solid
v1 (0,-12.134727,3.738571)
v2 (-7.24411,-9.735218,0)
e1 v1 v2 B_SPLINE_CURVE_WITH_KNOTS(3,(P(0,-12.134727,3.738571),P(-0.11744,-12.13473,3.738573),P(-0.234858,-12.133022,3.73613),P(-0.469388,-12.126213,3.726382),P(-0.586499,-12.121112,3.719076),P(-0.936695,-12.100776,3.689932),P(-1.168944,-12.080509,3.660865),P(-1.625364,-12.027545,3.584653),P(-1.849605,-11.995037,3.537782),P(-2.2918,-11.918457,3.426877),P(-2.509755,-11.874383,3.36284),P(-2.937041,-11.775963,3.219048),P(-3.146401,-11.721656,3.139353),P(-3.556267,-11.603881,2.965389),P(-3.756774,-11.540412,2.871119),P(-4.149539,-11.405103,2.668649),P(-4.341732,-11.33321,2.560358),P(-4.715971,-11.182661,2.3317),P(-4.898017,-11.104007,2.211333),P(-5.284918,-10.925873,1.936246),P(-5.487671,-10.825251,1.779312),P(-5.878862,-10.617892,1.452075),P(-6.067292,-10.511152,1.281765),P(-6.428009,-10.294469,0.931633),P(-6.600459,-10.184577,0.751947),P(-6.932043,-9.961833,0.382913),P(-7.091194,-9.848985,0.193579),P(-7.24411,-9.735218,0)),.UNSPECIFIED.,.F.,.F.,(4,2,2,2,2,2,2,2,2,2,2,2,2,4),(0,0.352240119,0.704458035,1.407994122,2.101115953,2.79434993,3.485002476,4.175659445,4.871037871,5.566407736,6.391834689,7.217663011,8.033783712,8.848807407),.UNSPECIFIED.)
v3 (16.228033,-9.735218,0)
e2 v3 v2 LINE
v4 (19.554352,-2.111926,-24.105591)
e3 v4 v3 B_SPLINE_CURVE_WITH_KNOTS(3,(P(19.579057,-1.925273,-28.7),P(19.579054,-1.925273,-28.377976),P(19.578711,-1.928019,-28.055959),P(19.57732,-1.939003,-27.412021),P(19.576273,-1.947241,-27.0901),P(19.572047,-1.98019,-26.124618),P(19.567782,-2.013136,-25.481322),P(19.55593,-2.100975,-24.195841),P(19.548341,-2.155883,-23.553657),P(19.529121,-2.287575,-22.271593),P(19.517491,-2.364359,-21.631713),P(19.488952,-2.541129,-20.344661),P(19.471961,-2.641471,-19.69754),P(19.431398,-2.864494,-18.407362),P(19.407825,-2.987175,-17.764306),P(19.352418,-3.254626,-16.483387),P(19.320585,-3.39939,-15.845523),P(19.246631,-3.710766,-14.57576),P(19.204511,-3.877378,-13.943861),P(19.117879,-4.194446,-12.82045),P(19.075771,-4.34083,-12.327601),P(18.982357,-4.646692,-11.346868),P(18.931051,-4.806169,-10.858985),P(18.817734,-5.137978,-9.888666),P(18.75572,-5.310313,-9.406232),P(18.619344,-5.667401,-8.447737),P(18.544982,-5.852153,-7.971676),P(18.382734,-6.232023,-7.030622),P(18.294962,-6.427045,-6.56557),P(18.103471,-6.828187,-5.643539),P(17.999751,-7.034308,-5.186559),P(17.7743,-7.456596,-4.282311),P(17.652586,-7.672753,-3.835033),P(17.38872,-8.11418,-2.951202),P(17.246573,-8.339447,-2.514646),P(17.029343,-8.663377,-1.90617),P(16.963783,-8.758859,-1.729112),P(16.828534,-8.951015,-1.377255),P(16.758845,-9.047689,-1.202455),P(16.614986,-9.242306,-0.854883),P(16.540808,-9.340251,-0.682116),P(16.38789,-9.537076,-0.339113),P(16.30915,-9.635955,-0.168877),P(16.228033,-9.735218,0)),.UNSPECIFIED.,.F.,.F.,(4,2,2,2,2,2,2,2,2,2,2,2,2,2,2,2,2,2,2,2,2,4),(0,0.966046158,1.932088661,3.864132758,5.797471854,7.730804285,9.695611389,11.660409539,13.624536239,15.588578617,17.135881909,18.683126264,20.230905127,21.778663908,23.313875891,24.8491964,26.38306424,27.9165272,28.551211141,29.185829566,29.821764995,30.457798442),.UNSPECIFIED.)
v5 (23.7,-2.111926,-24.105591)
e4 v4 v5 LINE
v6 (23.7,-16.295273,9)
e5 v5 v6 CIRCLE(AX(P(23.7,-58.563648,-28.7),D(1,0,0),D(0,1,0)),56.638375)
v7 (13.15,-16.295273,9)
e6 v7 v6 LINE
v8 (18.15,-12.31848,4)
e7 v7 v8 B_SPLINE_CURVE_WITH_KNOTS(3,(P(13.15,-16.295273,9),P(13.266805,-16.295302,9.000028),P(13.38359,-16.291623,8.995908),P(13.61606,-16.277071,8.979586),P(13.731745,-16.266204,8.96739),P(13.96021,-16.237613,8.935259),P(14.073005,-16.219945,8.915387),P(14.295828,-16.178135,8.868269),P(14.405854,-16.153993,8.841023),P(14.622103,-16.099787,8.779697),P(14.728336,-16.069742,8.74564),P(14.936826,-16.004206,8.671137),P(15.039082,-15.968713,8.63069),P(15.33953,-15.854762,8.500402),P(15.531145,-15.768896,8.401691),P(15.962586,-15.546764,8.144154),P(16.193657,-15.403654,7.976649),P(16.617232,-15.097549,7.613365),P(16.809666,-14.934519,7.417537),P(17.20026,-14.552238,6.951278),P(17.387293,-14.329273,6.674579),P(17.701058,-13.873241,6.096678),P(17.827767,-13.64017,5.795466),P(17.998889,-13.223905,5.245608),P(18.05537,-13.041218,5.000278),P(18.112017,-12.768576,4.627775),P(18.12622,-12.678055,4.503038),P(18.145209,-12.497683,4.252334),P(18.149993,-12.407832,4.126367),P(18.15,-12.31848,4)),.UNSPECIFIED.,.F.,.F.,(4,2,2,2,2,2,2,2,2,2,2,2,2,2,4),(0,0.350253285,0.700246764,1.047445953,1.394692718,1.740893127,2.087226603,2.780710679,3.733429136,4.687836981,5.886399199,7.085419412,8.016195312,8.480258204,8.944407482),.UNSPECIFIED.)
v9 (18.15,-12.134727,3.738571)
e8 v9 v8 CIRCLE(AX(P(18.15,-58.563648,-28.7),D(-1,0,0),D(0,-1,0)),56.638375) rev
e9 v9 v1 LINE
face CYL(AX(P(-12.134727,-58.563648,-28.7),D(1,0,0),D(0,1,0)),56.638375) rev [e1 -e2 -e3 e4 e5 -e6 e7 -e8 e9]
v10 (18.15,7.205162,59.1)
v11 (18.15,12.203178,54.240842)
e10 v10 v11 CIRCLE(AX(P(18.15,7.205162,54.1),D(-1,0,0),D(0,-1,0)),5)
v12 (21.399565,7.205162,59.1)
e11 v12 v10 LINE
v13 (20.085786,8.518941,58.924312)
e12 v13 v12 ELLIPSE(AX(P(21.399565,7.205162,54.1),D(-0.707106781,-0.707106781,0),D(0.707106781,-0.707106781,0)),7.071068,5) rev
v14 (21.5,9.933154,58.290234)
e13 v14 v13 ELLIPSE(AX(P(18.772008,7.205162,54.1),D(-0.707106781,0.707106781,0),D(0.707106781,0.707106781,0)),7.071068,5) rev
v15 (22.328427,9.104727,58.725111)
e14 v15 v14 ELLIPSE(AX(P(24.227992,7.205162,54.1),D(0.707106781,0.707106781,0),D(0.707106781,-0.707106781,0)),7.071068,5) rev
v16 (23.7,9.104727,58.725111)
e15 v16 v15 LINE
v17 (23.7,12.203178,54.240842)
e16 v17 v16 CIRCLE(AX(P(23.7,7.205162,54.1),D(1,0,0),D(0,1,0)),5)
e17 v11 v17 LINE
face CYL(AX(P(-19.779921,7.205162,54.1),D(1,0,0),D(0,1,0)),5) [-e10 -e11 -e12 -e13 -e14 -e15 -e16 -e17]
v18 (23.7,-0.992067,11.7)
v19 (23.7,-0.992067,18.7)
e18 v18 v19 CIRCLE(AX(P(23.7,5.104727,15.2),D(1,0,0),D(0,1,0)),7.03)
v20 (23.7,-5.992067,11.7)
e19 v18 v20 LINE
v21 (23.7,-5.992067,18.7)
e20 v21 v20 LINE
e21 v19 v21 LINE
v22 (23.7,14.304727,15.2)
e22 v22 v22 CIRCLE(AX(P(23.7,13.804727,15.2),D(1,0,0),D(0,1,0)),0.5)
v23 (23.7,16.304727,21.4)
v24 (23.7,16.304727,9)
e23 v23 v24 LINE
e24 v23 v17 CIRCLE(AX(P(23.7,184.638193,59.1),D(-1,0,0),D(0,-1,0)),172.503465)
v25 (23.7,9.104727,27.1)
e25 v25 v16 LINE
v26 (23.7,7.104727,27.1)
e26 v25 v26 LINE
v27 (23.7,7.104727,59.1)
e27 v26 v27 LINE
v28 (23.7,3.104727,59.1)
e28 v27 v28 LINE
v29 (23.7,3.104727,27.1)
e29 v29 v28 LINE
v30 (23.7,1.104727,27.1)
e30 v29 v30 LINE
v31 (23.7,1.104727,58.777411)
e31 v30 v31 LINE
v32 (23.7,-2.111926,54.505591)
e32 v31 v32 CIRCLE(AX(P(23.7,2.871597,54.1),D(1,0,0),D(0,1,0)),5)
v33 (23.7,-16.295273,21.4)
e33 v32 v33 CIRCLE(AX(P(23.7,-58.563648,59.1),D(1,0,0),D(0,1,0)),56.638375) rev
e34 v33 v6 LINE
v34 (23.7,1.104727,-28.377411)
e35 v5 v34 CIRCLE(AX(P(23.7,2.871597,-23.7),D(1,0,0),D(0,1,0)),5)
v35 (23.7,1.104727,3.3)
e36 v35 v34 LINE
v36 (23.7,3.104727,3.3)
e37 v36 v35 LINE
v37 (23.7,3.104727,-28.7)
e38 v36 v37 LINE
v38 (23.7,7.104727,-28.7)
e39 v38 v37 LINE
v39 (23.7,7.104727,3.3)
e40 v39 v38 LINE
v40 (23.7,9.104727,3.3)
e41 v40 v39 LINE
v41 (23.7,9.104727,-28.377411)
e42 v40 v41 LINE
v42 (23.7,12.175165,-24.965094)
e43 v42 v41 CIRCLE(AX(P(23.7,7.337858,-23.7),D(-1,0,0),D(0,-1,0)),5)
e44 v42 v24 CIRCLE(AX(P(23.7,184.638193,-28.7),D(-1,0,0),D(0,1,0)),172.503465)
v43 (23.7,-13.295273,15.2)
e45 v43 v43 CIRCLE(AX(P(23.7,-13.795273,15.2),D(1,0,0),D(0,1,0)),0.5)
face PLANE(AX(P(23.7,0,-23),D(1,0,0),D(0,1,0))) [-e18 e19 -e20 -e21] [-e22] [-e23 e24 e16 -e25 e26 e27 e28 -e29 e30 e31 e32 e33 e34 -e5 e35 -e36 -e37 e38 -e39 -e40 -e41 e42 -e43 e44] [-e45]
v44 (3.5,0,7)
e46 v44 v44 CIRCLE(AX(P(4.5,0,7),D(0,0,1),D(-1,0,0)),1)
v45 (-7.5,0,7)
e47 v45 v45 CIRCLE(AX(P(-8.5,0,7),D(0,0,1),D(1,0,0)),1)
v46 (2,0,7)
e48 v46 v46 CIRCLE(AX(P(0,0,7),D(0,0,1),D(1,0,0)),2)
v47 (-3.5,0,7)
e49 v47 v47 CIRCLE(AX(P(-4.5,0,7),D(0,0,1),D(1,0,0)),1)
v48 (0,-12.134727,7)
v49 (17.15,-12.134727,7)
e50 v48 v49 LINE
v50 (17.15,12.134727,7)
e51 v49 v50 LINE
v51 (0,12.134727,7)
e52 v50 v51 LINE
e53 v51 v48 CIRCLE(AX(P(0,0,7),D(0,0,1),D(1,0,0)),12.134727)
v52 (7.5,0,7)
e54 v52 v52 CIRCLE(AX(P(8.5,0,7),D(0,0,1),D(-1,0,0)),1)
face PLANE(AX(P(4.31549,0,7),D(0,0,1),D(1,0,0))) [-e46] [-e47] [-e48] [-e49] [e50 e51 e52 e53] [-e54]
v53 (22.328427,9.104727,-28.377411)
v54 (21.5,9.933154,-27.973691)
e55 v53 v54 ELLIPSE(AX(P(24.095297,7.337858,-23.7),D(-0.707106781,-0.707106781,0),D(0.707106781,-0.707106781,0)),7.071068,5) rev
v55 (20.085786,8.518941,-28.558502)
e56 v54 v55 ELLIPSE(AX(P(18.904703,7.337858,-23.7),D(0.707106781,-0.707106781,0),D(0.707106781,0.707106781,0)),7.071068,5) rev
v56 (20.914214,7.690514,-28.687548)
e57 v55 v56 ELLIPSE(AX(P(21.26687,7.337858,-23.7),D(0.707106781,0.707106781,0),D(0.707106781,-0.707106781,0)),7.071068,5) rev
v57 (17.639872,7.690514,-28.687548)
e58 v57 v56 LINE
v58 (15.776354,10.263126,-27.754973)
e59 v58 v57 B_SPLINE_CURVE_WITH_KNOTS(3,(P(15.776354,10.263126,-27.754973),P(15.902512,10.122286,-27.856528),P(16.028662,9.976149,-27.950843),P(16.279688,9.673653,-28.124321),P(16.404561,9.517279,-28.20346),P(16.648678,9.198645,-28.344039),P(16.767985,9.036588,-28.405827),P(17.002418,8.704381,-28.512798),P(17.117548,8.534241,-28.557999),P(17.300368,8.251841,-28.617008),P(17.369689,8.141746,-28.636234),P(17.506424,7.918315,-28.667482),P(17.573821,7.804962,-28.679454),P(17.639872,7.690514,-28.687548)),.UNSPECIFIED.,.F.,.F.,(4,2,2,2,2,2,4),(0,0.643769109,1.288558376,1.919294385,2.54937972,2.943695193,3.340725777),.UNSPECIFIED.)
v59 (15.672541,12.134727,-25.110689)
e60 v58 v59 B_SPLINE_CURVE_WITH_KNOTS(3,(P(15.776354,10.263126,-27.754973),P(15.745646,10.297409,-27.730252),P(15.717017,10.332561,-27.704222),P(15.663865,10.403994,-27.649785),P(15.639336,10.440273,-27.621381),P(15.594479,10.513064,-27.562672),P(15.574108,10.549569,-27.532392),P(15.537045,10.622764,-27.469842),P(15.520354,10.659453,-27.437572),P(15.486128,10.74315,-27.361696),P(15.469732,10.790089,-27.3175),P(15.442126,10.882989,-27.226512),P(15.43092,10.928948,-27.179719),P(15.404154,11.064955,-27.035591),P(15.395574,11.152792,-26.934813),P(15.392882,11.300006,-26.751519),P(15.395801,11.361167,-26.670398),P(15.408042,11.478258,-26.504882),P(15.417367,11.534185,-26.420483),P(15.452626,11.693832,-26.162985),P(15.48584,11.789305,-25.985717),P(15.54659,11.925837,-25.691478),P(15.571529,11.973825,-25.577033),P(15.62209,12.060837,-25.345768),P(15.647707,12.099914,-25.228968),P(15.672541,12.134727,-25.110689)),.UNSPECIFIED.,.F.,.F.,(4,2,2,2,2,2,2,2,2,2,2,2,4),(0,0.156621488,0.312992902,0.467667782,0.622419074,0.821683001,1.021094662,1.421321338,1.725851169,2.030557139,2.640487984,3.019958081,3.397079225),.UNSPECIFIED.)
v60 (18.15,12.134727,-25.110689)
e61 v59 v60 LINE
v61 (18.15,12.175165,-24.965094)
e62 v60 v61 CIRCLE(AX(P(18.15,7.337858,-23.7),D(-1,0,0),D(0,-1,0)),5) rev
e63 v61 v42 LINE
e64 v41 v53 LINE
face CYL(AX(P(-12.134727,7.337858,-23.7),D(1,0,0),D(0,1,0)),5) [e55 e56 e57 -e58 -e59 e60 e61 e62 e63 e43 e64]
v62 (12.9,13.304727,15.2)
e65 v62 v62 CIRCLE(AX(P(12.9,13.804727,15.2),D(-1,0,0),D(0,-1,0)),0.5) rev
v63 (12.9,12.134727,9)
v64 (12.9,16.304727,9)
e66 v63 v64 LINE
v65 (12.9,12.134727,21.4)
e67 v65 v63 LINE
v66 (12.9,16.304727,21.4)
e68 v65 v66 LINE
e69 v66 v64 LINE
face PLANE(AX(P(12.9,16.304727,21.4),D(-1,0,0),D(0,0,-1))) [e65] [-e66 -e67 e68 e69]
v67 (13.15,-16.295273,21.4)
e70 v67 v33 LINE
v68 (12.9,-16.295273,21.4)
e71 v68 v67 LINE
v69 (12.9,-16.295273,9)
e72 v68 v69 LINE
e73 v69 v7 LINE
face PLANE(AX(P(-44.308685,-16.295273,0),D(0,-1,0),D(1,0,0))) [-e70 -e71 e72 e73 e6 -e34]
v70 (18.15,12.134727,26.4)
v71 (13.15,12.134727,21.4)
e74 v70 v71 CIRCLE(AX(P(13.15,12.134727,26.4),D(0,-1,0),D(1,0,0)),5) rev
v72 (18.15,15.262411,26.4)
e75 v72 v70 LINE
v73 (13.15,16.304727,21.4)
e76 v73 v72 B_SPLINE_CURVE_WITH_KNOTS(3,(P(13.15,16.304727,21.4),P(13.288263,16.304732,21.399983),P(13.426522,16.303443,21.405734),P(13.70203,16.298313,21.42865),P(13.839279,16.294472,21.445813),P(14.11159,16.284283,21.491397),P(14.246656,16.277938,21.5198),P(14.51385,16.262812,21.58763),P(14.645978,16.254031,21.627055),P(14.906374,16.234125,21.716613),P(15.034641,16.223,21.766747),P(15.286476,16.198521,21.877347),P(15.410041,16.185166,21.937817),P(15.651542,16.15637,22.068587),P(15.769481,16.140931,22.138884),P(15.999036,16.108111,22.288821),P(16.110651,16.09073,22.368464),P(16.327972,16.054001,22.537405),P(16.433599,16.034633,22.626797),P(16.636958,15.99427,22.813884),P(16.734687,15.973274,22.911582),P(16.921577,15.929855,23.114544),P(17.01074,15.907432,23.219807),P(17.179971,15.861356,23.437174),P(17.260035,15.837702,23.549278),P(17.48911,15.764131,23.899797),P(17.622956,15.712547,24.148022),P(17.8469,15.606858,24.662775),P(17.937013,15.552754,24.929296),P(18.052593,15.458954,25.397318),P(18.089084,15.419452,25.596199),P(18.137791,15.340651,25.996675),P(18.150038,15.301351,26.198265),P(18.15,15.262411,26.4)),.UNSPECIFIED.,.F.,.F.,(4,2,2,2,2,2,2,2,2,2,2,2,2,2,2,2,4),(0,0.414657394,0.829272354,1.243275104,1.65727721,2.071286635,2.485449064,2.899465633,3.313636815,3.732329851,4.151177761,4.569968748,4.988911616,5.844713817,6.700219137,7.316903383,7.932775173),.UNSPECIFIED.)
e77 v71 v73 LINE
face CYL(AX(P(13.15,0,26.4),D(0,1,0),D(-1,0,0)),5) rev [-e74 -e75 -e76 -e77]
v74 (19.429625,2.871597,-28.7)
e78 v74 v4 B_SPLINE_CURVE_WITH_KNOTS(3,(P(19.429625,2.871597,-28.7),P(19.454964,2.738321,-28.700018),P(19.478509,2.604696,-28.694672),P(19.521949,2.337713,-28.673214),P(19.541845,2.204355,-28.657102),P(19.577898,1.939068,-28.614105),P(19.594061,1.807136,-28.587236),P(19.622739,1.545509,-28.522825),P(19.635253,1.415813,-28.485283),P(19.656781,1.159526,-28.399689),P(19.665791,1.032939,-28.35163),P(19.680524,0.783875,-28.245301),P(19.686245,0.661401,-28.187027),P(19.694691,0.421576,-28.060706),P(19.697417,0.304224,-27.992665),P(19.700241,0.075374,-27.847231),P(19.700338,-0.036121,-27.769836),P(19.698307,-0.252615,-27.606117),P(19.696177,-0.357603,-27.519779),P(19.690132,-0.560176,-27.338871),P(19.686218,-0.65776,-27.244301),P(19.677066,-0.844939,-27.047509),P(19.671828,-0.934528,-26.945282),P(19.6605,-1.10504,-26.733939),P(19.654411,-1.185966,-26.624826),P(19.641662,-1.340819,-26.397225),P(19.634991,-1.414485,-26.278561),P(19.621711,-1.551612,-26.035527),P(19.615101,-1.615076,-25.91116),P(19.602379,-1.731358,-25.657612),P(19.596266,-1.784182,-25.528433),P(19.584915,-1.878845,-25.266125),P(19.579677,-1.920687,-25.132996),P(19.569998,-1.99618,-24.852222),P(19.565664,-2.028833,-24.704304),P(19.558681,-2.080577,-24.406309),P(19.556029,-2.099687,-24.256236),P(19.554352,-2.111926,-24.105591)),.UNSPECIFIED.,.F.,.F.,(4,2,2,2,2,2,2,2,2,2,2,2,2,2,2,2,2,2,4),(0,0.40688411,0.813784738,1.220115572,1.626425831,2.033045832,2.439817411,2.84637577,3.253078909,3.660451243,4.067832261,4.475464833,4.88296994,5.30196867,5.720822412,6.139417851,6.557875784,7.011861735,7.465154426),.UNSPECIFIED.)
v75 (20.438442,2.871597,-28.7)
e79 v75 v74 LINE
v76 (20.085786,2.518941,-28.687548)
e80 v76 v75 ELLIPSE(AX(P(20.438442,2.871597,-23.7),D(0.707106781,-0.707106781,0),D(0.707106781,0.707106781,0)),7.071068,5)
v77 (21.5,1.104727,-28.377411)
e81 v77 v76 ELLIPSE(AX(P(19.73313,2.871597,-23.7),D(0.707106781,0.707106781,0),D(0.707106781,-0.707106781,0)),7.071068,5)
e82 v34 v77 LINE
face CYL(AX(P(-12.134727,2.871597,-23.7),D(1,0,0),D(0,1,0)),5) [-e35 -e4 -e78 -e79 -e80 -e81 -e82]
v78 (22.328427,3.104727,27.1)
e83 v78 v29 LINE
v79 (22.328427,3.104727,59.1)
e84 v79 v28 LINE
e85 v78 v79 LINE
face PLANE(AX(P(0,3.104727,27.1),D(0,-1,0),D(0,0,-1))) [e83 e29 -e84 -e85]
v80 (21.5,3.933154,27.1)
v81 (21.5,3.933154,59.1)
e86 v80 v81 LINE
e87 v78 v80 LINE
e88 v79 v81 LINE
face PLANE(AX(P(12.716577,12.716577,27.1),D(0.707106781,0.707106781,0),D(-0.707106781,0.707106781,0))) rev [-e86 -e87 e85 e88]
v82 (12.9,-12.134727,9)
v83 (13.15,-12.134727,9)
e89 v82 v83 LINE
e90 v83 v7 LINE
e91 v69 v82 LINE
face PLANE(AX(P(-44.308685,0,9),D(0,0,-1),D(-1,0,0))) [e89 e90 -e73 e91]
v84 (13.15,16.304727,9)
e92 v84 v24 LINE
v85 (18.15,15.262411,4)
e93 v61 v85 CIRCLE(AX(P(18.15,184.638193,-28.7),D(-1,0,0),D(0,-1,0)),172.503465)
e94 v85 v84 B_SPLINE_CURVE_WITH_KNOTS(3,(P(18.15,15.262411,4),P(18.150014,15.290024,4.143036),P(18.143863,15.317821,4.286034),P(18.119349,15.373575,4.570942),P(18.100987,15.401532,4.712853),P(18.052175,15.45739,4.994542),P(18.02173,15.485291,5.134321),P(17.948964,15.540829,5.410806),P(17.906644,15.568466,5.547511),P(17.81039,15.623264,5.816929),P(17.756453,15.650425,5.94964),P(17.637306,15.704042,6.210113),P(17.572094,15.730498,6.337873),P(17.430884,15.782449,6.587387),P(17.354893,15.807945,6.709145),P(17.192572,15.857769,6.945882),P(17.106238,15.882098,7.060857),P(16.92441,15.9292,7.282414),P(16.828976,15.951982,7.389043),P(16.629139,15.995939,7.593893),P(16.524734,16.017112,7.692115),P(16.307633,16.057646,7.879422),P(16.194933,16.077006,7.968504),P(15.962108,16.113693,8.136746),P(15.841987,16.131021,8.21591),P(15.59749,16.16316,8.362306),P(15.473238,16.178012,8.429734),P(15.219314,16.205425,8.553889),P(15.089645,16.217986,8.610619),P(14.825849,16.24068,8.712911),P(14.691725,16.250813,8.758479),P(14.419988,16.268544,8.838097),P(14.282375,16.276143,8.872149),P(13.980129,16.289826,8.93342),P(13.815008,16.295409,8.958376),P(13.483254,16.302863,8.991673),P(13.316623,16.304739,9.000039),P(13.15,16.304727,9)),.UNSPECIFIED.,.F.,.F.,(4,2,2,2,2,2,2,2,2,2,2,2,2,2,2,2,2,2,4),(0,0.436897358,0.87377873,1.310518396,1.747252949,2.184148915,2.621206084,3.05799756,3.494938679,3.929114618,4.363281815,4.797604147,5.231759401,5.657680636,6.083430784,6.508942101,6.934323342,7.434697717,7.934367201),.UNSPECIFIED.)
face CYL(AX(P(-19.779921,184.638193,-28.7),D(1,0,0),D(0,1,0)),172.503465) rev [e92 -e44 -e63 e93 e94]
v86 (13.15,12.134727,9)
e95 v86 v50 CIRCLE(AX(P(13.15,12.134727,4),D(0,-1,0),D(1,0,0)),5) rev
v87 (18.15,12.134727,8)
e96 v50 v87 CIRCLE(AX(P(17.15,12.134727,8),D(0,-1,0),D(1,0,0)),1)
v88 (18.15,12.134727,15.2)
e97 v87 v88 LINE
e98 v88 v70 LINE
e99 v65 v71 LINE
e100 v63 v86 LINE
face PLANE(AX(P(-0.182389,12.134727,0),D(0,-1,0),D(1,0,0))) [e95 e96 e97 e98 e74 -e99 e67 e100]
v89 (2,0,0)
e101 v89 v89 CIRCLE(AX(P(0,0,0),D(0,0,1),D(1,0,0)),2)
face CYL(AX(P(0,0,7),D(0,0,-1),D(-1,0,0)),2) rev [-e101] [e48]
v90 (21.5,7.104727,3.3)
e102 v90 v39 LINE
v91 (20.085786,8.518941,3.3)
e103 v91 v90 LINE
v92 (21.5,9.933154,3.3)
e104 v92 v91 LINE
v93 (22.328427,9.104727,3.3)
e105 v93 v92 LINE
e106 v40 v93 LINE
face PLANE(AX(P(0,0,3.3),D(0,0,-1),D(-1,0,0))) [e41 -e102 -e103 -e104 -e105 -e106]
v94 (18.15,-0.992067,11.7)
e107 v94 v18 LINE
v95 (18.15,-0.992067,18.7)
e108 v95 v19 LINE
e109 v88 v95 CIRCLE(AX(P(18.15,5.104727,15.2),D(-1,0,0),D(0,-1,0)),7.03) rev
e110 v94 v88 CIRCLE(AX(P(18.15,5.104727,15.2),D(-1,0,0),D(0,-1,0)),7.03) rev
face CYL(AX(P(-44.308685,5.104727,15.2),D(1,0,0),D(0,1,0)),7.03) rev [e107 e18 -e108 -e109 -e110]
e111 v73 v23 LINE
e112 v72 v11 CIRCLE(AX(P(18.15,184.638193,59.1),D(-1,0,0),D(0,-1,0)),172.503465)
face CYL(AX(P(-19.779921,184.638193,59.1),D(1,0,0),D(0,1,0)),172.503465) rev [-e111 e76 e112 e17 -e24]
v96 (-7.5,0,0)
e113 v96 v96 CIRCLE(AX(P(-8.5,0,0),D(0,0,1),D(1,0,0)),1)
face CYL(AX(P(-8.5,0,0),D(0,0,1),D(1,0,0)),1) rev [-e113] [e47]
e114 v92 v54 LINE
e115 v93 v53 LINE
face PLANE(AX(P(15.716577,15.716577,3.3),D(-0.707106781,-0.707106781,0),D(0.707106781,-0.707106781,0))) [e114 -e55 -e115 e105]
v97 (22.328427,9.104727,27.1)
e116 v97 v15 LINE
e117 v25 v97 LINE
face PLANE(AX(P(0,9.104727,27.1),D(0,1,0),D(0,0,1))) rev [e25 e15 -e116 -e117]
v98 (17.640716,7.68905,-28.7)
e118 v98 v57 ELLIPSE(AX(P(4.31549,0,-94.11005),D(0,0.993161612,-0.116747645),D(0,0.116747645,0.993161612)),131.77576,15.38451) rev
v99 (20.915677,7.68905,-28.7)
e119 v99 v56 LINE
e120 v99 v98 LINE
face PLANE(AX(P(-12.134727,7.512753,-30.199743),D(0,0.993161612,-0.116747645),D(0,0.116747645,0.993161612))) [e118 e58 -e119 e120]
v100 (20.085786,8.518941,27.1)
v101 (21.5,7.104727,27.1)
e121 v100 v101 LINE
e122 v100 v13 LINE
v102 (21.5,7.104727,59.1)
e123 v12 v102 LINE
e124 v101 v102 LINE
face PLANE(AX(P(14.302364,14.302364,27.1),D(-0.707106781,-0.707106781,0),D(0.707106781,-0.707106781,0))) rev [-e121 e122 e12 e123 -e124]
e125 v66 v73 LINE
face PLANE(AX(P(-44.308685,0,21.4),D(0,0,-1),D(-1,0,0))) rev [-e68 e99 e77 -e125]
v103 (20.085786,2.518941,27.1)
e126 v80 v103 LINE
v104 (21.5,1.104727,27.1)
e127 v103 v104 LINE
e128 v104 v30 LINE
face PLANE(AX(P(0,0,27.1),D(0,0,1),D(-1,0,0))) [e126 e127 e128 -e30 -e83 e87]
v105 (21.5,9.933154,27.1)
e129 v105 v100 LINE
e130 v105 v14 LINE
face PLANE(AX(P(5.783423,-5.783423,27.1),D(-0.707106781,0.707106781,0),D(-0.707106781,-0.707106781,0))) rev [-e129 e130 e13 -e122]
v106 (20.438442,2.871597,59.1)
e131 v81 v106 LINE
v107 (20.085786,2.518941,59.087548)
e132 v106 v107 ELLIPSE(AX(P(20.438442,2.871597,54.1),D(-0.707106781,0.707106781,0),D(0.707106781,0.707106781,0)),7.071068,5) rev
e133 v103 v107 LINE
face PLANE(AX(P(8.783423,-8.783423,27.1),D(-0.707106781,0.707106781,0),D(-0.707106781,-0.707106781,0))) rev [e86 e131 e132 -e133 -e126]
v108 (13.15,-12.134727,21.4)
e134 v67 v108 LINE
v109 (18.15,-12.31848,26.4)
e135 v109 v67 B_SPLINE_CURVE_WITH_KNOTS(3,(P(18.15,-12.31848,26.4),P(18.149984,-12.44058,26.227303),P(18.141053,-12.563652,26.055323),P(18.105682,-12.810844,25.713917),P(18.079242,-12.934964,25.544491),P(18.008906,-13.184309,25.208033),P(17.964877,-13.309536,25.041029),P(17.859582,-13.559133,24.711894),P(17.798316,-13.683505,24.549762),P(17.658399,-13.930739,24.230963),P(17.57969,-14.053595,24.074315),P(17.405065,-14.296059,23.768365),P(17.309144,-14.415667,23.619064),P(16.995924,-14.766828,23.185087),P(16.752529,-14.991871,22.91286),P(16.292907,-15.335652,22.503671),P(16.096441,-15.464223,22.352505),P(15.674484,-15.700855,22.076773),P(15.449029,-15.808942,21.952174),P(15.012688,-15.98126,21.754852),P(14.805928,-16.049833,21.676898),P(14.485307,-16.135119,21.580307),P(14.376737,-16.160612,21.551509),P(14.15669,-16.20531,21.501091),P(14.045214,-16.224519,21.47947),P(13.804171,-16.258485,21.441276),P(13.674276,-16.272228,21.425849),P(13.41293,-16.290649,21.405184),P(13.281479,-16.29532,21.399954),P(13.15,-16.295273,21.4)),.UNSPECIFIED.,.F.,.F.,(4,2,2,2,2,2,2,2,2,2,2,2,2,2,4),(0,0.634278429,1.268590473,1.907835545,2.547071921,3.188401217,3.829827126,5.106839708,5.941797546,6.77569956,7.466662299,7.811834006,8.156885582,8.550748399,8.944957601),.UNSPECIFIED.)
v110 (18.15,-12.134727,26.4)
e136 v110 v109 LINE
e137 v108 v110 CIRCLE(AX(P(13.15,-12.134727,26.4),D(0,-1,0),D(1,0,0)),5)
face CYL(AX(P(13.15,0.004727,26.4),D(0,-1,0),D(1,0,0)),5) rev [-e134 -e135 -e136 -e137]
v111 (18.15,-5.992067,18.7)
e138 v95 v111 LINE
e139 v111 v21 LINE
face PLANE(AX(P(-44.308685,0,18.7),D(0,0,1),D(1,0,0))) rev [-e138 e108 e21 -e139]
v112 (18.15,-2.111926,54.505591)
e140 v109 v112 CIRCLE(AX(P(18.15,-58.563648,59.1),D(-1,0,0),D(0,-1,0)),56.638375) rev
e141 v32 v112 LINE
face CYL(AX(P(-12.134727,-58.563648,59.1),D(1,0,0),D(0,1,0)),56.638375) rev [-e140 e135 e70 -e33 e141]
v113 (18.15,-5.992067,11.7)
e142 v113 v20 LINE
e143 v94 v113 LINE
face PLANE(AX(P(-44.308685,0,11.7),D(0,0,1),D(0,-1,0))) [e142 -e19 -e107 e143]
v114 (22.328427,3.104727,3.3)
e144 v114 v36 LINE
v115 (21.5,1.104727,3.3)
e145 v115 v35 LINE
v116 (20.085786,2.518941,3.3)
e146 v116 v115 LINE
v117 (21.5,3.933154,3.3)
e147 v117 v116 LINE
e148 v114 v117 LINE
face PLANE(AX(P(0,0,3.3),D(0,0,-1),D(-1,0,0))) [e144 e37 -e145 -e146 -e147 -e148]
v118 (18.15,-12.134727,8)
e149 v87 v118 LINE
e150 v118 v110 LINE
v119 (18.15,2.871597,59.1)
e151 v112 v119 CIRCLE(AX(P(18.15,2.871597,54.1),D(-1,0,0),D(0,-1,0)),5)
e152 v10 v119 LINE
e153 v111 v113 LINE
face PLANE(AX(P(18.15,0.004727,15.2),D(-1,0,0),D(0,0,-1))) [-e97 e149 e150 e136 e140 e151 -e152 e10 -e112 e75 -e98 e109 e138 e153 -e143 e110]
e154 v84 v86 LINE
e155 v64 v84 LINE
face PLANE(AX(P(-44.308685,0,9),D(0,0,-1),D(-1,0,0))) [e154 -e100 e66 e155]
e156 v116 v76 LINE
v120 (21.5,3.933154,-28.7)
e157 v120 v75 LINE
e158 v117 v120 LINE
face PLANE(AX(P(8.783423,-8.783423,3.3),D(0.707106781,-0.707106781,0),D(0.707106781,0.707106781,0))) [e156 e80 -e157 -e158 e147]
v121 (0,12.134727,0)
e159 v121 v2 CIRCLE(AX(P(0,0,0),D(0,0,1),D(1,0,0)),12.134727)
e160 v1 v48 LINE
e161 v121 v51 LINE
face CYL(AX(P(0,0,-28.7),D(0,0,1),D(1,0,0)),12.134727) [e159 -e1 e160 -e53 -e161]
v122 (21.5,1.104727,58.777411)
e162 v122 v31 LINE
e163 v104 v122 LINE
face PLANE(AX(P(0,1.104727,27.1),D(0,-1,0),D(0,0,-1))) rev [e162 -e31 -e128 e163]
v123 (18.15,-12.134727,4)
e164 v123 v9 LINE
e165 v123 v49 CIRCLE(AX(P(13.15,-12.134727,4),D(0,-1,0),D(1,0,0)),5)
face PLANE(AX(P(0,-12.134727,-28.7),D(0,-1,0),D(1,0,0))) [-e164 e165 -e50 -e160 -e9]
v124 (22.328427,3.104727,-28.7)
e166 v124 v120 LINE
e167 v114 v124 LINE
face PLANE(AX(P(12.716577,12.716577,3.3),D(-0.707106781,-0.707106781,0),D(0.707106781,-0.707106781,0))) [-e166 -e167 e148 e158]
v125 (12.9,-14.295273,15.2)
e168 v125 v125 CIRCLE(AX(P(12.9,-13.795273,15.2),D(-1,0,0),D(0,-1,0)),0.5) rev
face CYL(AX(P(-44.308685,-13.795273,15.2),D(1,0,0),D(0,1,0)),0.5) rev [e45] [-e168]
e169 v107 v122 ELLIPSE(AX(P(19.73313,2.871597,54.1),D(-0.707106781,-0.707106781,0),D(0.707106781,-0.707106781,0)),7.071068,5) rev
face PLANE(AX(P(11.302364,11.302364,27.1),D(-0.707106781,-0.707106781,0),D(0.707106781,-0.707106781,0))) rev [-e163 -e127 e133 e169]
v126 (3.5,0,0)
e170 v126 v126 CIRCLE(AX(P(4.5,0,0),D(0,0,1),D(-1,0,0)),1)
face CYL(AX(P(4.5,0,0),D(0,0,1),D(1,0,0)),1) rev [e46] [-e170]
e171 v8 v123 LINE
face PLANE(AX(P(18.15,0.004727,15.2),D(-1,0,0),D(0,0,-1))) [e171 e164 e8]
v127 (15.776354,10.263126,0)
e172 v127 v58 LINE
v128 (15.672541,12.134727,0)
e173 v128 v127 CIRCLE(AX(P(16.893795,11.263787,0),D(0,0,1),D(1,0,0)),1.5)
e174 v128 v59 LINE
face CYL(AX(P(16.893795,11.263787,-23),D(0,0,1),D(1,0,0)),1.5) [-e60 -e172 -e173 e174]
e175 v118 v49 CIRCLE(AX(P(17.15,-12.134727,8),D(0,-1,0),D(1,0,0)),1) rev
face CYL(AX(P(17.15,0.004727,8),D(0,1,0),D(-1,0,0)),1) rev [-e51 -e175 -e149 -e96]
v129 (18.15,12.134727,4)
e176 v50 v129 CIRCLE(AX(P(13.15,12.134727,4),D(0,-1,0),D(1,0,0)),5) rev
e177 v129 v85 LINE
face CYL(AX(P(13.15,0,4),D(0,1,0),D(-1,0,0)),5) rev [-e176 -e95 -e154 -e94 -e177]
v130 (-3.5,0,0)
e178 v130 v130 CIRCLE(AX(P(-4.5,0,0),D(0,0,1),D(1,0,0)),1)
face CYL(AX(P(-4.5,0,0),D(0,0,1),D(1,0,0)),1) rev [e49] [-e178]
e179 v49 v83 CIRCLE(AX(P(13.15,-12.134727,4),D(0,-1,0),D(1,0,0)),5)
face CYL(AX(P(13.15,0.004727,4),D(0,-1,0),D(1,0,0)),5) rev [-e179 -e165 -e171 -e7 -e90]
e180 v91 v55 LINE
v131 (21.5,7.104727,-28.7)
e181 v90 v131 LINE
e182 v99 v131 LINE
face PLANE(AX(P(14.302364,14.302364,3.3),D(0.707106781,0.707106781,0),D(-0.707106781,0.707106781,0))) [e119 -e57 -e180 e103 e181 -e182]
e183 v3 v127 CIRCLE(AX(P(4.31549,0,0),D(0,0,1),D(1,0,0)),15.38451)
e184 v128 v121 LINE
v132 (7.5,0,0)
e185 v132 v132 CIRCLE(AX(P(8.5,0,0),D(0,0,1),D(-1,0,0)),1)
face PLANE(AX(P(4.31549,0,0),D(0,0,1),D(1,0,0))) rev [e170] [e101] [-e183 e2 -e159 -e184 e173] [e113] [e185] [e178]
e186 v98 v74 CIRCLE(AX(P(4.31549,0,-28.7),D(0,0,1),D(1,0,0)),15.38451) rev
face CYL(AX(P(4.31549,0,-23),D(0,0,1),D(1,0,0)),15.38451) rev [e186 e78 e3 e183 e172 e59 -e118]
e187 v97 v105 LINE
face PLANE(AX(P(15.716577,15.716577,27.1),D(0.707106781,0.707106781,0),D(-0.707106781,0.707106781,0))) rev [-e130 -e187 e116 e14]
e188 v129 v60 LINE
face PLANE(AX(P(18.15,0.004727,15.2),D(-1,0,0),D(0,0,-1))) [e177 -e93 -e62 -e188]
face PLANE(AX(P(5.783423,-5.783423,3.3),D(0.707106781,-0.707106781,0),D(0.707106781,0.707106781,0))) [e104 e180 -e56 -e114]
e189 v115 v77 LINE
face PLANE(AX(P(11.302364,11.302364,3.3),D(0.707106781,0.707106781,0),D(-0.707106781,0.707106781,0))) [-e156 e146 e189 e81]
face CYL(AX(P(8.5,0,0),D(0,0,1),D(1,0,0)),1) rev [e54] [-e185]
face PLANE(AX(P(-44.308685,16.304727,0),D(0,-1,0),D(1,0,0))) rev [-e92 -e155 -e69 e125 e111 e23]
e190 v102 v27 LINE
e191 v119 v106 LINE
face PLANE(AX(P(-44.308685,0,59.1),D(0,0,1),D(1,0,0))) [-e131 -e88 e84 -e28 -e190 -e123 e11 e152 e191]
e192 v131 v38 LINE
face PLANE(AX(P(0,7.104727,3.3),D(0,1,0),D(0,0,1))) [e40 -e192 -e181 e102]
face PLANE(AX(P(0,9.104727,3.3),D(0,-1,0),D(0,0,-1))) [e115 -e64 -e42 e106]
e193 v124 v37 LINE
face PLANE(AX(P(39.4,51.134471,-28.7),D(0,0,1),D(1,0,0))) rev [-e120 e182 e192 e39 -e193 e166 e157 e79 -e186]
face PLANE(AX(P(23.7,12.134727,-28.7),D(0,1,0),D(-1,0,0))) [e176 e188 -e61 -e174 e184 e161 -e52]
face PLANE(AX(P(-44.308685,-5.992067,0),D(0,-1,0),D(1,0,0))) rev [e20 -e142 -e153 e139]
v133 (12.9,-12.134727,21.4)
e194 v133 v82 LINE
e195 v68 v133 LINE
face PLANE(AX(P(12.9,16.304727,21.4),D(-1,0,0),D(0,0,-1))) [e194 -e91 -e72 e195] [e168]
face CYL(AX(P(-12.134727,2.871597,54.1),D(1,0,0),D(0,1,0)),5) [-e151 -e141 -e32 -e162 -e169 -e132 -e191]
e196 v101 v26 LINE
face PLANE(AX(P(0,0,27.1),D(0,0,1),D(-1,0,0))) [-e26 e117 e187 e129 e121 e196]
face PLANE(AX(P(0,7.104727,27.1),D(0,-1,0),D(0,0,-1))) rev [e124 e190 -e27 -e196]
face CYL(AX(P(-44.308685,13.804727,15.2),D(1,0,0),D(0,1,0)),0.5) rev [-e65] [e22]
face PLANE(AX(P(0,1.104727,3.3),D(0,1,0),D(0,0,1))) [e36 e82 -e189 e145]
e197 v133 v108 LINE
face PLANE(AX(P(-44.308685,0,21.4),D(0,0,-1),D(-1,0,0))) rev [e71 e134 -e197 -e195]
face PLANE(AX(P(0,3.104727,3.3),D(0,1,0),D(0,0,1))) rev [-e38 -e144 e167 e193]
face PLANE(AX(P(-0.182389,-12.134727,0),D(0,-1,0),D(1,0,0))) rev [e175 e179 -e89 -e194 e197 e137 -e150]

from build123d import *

# Parameters (mm, degrees)
SKETCH1_R               = 2
BOSS_EXTRUDE3_DEPTH     = 7
SKETCH3_R               = 1.0000000000000002
SKETCH3_R_2             = 0.9999999999999998
SKETCH3_R_3             = 0.9999999999999996
SKETCH3_R_4             = 0.9999999999999993
CUT_EXTRUDE2_DEPTH      = 26.09227496303999
BOSS_EXTRUDE4_START     = -7
BOSS_EXTRUDE4_DEPTH     = 7
BOSS_EXTRUDE5_START     = -30
BOSS_EXTRUDE5_DEPTH     = 30
FILLET2_R               = 1.5
CUT_EXTRUDE5_DEPTH      = 42.36510924463761
BOSS_EXTRUDE6_DEPTH     = 10.5
MOVE_START              = -28.7
MOVE_FACE1_DEPTH        = 5.7
DELETEFACE1_START       = 23.7
DELETEFACE1_OUTLINE_W   = 10.499999999999998
DELETEFACE1_OUTLINE_H   = 35.699999999999996
DELETEFACE1_DEPTH       = 15.7
SKETCH11_OUTSIDE_W      = 51.876
SKETCH11_OUTSIDE_H      = 42.462
CUT_EXTRUDE6_DEPTH      = 46.16926949380307
SERVO_START             = -12.760864102
SERVO_MICRO_OUTLINE_W   = 22.6
SERVO_MICRO_OUTLINE_H   = 12.399999999999999
SERVO_MICRO_DEPTH       = 22.3
SERVO_START_2           = 9.539135898
SERVO_MICRO_2_DEPTH     = 4.3
SERVO_START_3           = 2.889135898
SERVO_MICRO_3_DEPTH     = 2.4
SERVO_START_4           = 13.839135898
SERVO_MICRO_4_OUTLINE_R = 2.5
SERVO_MICRO_4_DEPTH     = 3.3
SERVO_START_5           = -25.667487826
SERVO_MICRO_5_OUTLINE_R = 0.6
SERVO_MICRO_5_DEPTH     = 2.3
SERVO_MICRO_6_OUTLINE_R = 0.6
SERVO_MICRO_6_DEPTH     = 2.3
SERVO_MICRO_7_OUTLINE_R = 0.6
SERVO_MICRO_7_DEPTH     = 2.3
BODY_MOVE_COPY1_ANGLE   = 90
SKETCH13_R              = 0.5000000000000009
SKETCH13_W              = 12.399999999999997
SKETCH13_H              = 4.17
SKETCH13_H_2            = 4.160545319150279
BOSS_EXTRUDE7_DEPTH     = 5.55
SKETCH13_3_W            = 12.399999999999997
SKETCH13_3_H            = 4.17
SKETCH13_3_R            = 0.5000000000000009
SKETCH13_3_H_2          = 4.160545319150279
BOSS_EXTRUDE8_DEPTH     = 10.8
CUT_EXTRUDE7_DEPTH      = 32
BOSS_EXTRUDE9_DEPTH     = 5.55
CUT_EXTRUDE8_DEPTH      = 72.0125468998838
BOSS_EXTRUDE10_DEPTH    = 5.55
FILLET4_R               = 5
CUT_EXTRUDE10_DEPTH     = 72.01254695034633
FILLET8_START           = 12.13472734
FILLET8_DEPTH           = 2.98662
FILLET8_START_2         = -12.463268044
FILLET8_2_DEPTH         = 0.328540704
FILLET8_START_3         = -16.295273118
FILLET8_3_DEPTH         = 3.832005074
FILLET8_START_4         = 15.12134734
FILLET8_4_DEPTH         = 1.18338
FILLET8_START_5         = -7.24411042
FILLET8_5_DEPTH         = 25.39411042
FILLET9_R               = 1


with BuildPart() as part:
    # Sketch1 → Boss-Extrude3 (new body)
    with BuildSketch(Plane.XY):
        with BuildLine():
            Line((5.606455718863049, 13.824363162033857), (-15.462379801128069, 15.791841653866829))
            Line((-15.462379801128069, 15.791841653866829), (-15.46237980112806, -15.791841653866806))
            Line((-15.46237980112806, -15.791841653866806), (5.606455718863063, -13.824363162033817))
            ThreePointArc((5.606455718863063, -13.824363162033817), (18.200000000000003, 2.613e-14), (5.606455718863049, 13.824363162033857))
        make_face()
        Circle(SKETCH1_R, mode=Mode.SUBTRACT)
    extrude(amount=BOSS_EXTRUDE3_DEPTH)

    # Sketch3 → Cut-Extrude2 (cut, through all)
    with BuildSketch(Plane.XY.offset(7)):
        with Locations((-4.5, 0)):
            Circle(SKETCH3_R)
        with Locations((-8.499999999999998, 0)):
            Circle(SKETCH3_R_2)
        with Locations(Location((4.5, -1.73e-15, 0), (0, 0, 180))):
            Circle(SKETCH3_R_3)
        with Locations(Location((8.499999999999998, -1.73e-15, 0), (0, 0, 180))):
            Circle(SKETCH3_R_4)
    extrude(amount=-CUT_EXTRUDE2_DEPTH, mode=Mode.SUBTRACT)

    # Sketch6 → Boss-Extrude4 (add)
    with BuildSketch(Plane.XY.offset(7).offset(BOSS_EXTRUDE4_START)):
        with BuildLine():
            Line((12.20372638619735, 13.208287910486863), (5.606455718863047, 13.824363162033858))
            ThreePointArc((5.606455718863047, 13.82436316203386), (18.2, 2.598e-14), (5.606455718863056, -13.824363162033816))
            Line((5.606455718863056, -13.824363162033816), (12.203726386197348, -13.208287910486817))
            ThreePointArc((12.203726386197348, -13.208287910486817), (19.699999999999996, 2.132e-14), (12.20372638619735, 13.20828791048686))
        make_face()
    extrude(amount=BOSS_EXTRUDE4_DEPTH)

    # Sketch6<3> → Boss-Extrude5 (add)
    with BuildSketch(Plane.XY.offset(7).offset(BOSS_EXTRUDE5_START)):
        with BuildLine():
            Line((23.700000000000006, 12.13472734042489), (12.20372638619735, 13.208287910486863))
            ThreePointArc((12.20372638619735, 13.20828791048686), (19.699999999999996, 2.132e-14), (12.203726386197348, -13.208287910486817))
            Line((12.203726386197348, -13.208287910486817), (23.700000000000003, -12.134727340424835))
            Line((23.700000000000003, -12.134727340424835), (23.700000000000006, 12.134727340424892))
        make_face()
    extrude(amount=BOSS_EXTRUDE5_DEPTH)

    # Fillet2
    fillet2_edges = [part.edges().sort_by_distance(p)[0] for p in [
        (12.20372638619735, -13.208287910486817, -11.5),
        (12.20372638619735, 13.208287910486861, -11.5),
    ]]
    fillet(fillet2_edges, radius=FILLET2_R)

    # Sketch8 → Cut-Extrude5 (cut, through all)
    with BuildSketch(Plane.XY.offset(7)):
        with BuildLine():
            Line((-15.462379801128069, 15.791841653866829), (-15.46237980112806, -15.791841653866808))
            Line((-15.46237980112806, -15.791841653866806), (1.328273056892355, -14.223874201150027))
            ThreePointArc((1.3282730568923518, -14.22387420115002), (-14.285758873920813, 0), (1.3282730568923529, 14.22387420115002))
            Line((1.3282730568923604, 14.223874201150062), (-15.462379801128069, 15.791841653866829))
        make_face()
    extrude(amount=-CUT_EXTRUDE5_DEPTH, mode=Mode.SUBTRACT)

    # Sketch10 → Boss-Extrude6 (add)
    with BuildSketch(Plane.ZX.offset(1.6347273404248903)):
        Polygon((7, 23.700000000000003), (7, 39.40000000018666), (-28.700000000000003, 39.40000000018665), (-28.700000000000014, 23.700000000000003), align=None)
    extrude(amount=BOSS_EXTRUDE6_DEPTH)

    # Move Face1: read off the stored shape, not the designer's step
    # Move Face1 outline → Move Face1 (add)
    with BuildSketch(Plane.XY.offset(MOVE_START)):
        with BuildLine():
            Line((17.033263706, -12.757289525), (23.7, -12.13472734))
            Line((23.7, -12.13472734), (23.7, 12.13472734))
            Line((23.7, 12.13472734), (17.033263706, 12.757289525))
            ThreePointArc((17.033263706, 12.757289525), (15.554272674, 11.938827155), (15.776353621, 10.263125757))
            ThreePointArc((15.776353621, 10.263125757), (19.7, 0), (15.776353621, -10.263125757))
            ThreePointArc((15.776353621, -10.263125757), (15.554272674, -11.938827155), (17.033263706, -12.757289525))
        make_face()
    extrude(amount=MOVE_FACE1_DEPTH)

    # DeleteFace1: read off the stored shape, not the designer's step
    # DeleteFace1 outline → DeleteFace1 (cut)
    with BuildSketch(Plane.YZ.offset(DELETEFACE1_START)):
        with Locations((6.884727339999999, -10.849999999999998)):
            Rectangle(DELETEFACE1_OUTLINE_W, DELETEFACE1_OUTLINE_H)
    extrude(amount=DELETEFACE1_DEPTH, mode=Mode.SUBTRACT)

    # Sketch11 outside → Cut-Extrude6 (cut, through all)
    with BuildSketch(Plane.XY.offset(7)):
        with Locations((4.706999999999997, 0)):
            Rectangle(SKETCH11_OUTSIDE_W, SKETCH11_OUTSIDE_H)
        with BuildLine():
            Line((23.700000000000003, 12.134727340424888), (-1.43e-15, 12.134727340424885))
            ThreePointArc((-1.43e-15, 12.134727340424885), (-12.134727340424885, 1.49e-15), (0, -12.134727340424885))
            Line((0, -12.134727340424885), (23.700000000000006, -12.134727340424835))
            Line((23.700000000000006, -12.134727340424835), (23.700000000000003, 12.134727340424888))
        make_face(mode=Mode.SUBTRACT)
    extrude(amount=-CUT_EXTRUDE6_DEPTH, mode=Mode.SUBTRACT)

    # Sketch13 → Boss-Extrude7 (add)
    # profile 1 of 3: a face of its own
    with BuildSketch(Plane(origin=(23.700000000000003, -3.39e-15, 0), x_dir=(0, 0, -1), z_dir=(1, -1.4e-16, 0))):
        Polygon((-9.000000000000002, -16.295272659575108), (-9.000000000000002, -12.134727340424831), (-7, -12.134727340424831), (-6.999999999999999, 12.134727340424892), (-9.000000000000002, 12.13472734042489), (-9.000000000000002, 16.30472734042489), (-21.4, 16.30472734042489), (-21.4, 12.13472734042489), (-59.100000000000016, 12.134727340424885), (-59.100000000000016, -12.134727340424831), (-21.4, -12.134727340424831), (-21.4, -16.295272659575108), align=None)
        with Locations(Location((-15.200000000000001, 13.80472734042489, 0), (0, 0, 90))):
            Circle(SKETCH13_R, mode=Mode.SUBTRACT)
        with Locations(Location((-15.200000000000001, -13.79527265957511, 0), (0, 0, 90))):
            Circle(SKETCH13_R, mode=Mode.SUBTRACT)
        with BuildLine():
            ThreePointArc((-11.700000000000001, -0.9920668991734916), (-15.199999999999998, 12.13472734042489), (-18.700000000000003, -0.9920668991734924))
            Line((-18.700000000000003, -0.9920668991734924), (-18.700000000000003, -5.9920668991734924))
            Line((-18.700000000000003, -5.9920668991734924), (-11.700000000000003, -5.992066899173492))
            Line((-11.700000000000003, -5.992066899173492), (-11.700000000000001, -0.9920668991734916))
        make_face(mode=Mode.SUBTRACT)
    # profile 2 of 3: a face of its own
    with BuildSketch(Plane(origin=(23.700000000000003, -3.39e-15, 0), x_dir=(0, 0, -1), z_dir=(1, -1.4e-16, 0))):
        with Locations((-15.2, 14.219727340424889)):
            Rectangle(SKETCH13_W, SKETCH13_H)
        with Locations(Location((-15.200000000000001, 13.80472734042489, 0), (0, 0, 90))):
            Circle(SKETCH13_R, mode=Mode.SUBTRACT)
    # profile 3 of 3: a face of its own
    with BuildSketch(Plane(origin=(23.700000000000003, -3.39e-15, 0), x_dir=(0, 0, -1), z_dir=(1, -1.4e-16, 0))):
        with Locations((-15.2, -14.214999999999968)):
            Rectangle(SKETCH13_W, SKETCH13_H_2)
        with Locations(Location((-15.200000000000001, -13.79527265957511, 0), (0, 0, 90))):
            Circle(SKETCH13_R, mode=Mode.SUBTRACT)
    extrude(amount=-BOSS_EXTRUDE7_DEPTH)

    # Sketch13<3> → Boss-Extrude8 (add)
    # profile 1 of 2: a face of its own
    with BuildSketch(Plane(origin=(23.700000000000003, -3.39e-15, 0), x_dir=(0, 0, -1), z_dir=(1, -1.4e-16, 0))):
        with Locations((-15.2, 14.219727340424889)):
            Rectangle(SKETCH13_3_W, SKETCH13_3_H)
        with Locations(Location((-15.200000000000001, 13.80472734042489, 0), (0, 0, 90))):
            Circle(SKETCH13_3_R, mode=Mode.SUBTRACT)
    # profile 2 of 2: a face of its own
    with BuildSketch(Plane(origin=(23.700000000000003, -3.39e-15, 0), x_dir=(0, 0, -1), z_dir=(1, -1.4e-16, 0))):
        with Locations((-15.2, -14.214999999999968)):
            Rectangle(SKETCH13_3_W, SKETCH13_3_H_2)
        with Locations(Location((-15.200000000000001, -13.79527265957511, 0), (0, 0, 90))):
            Circle(SKETCH13_3_R, mode=Mode.SUBTRACT)
    extrude(amount=-BOSS_EXTRUDE8_DEPTH)

    # Sketch15 → Cut-Extrude7 (cut)
    with BuildSketch(Plane(origin=(1.903e-14, 0, -28.70000000000003), x_dir=(-1, 0, -6.6e-16), z_dir=(6.6e-16, 0, -1))):
        Polygon((-22.328427124746177, 3.104727340424887), (-23.699999999999985, 3.104727340424887), (-23.699999999999985, 1.1047273404248876), (-21.499999999999986, 1.1047273404248876), (-20.08578643762689, 2.5189409027979854), (-21.49999999999999, 3.9331544651710773), align=None)
        Polygon((-22.328427124746177, 9.104727340424887), (-23.699999999999985, 9.104727340424887), (-23.699999999999985, 7.104727340424887), (-21.499999999999986, 7.104727340424887), (-20.08578643762689, 8.518940902797986), (-21.49999999999999, 9.933154465171077), align=None)
    cut_extrude7 = extrude(amount=-CUT_EXTRUDE7_DEPTH, mode=Mode.SUBTRACT)

    # Mirror1: Cut-Extrude7 across plane
    add(cut_extrude7.mirror(Plane(origin=(0, 0, 15.200000000000001), x_dir=(1, 0, 0), z_dir=(0, 0, -1))), mode=Mode.SUBTRACT)

    # Sketch16 → Boss-Extrude9 (add)
    with BuildSketch(Plane(origin=(23.700000000000003, -3.39e-15, 0), x_dir=(0, 0, -1), z_dir=(1, -1.4e-16, 0))):
        with BuildLine():
            Line((-21.4, 12.13472734042489), (-21.4, 16.30472734042489))
            ThreePointArc((-21.4, 16.30472734042489), (-40.135039546574305, 13.18039662240372), (-59.100000000000016, 12.134727340424885))
            Line((-59.100000000000016, 12.134727340424885), (-21.4, 12.13472734042489))
        make_face()
        with BuildLine():
            Line((-9.000000000000002, 16.30472734042489), (-9.000000000000002, 12.13472734042489))
            Line((-9.000000000000002, 12.13472734042489), (28.700000000000014, 12.134727340424892))
            ThreePointArc((28.700000000000014, 12.134727340424892), (9.735039546574328, 13.180396622403777), (-9.000000000000002, 16.30472734042489))
        make_face()
    extrude(amount=-BOSS_EXTRUDE9_DEPTH)

    # Sketch18 → Cut-Extrude8 (cut, through all)
    with BuildSketch(Plane(origin=(23.700000000000003, -3.39e-15, 0), x_dir=(0, 0, -1), z_dir=(1, -1.4e-16, 0))):
        with BuildLine():
            Line((-59.100000000000016, -12.134727340424831), (-26.661429094135563, -12.134727340424831))
            ThreePointArc((-26.661429094135563, -12.134727340424838), (-42.096369157624615, -4.537893974213425), (-59.100000000000016, -1.9252726595751))
            Line((-59.100000000000016, -1.9252726595751037), (-59.100000000000016, -12.134727340424831))
        make_face()
        with BuildLine():
            Line((-3.7385709058644423, -12.134727340424831), (28.700000000000003, -12.134727340424831))
            Line((28.700000000000003, -12.134727340424831), (28.700000000000003, -1.9252726595751037))
            ThreePointArc((28.700000000000003, -1.9252726595751), (11.69636915762461, -4.537893974213425), (-3.738570905864435, -12.134727340424838))
        make_face()
    extrude(amount=-CUT_EXTRUDE8_DEPTH, mode=Mode.SUBTRACT)

    # Sketch18<3> → Boss-Extrude10 (add)
    with BuildSketch(Plane(origin=(23.700000000000003, -3.39e-15, 0), x_dir=(0, 0, -1), z_dir=(1, -1.4e-16, 0))):
        with BuildLine():
            ThreePointArc((-26.661429094135563, -12.134727340424838), (-23.96906894889605, -14.137042924937433), (-21.4, -16.295272659575097))
            Line((-21.4, -16.295272659575108), (-21.4, -12.134727340424831))
            Line((-21.4, -12.134727340424831), (-26.66142909413556, -12.134727340424831))
        make_face()
        with BuildLine():
            ThreePointArc((-9, -16.295272659575097), (-6.430931051103947, -14.137042924937433), (-3.738570905864435, -12.134727340424838))
            Line((-3.7385709058644423, -12.134727340424831), (-9.000000000000005, -12.134727340424831))
            Line((-9.000000000000005, -12.134727340424831), (-9.000000000000005, -16.295272659575108))
        make_face()
    extrude(amount=-BOSS_EXTRUDE10_DEPTH)

    # Fillet4
    fillet4_edges = [part.edges().sort_by_distance(p)[0] for p in [
        (21.63952842596371, -1.9252726595751048, -28.700000000000003),
        (20.925, -1.925272659575101, 59.10000000000002),
        (20.925000000000004, 12.134727340424881, 59.100000000000016),
    ]]
    fillet(fillet4_edges, radius=FILLET4_R)

    # Sketch19 → Cut-Extrude10 (cut, through all)
    with BuildSketch(Plane(origin=(23.700000000000003, -3.39e-15, 0), x_dir=(0, 0, -1), z_dir=(1, -1.4e-16, 0))):
        with BuildLine():
            Line((24.105591483628846, 12.321380196120076), (30.19974331893468, 12.321380196120076))
            Line((30.19974331893468, 12.321380196120076), (30.19974331893468, 7.512752922909521))
            Line((30.19974331893468, 7.512752922909521), (28.687547870024137, 7.690513778051795))
            ThreePointArc((28.687547870024137, 7.690513778051795), (28.58393863914358, 8.408905582685197), (28.37741082226619, 9.10472734042489))
            ThreePointArc((28.37741082226619, 9.10472734042489), (26.70764725474025, 11.33211091295099), (24.105591483628846, 12.321380196120076))
        make_face()
    extrude(amount=-CUT_EXTRUDE10_DEPTH, mode=Mode.SUBTRACT)

    # Fillet8: read off the stored shape, not the designer's step
    # Fillet8 outline → Fillet8 (add)
    with BuildSketch(Plane(origin=(0, 0, 0), x_dir=(1, 0, 0), z_dir=(0, 1, 0)).offset(FILLET8_START)):
        with BuildLine():
            Line((13.15, -9), (18.15, -9))
            Line((18.15, -9), (18.15, -4))
            ThreePointArc((18.15, -4), (16.685533906, -7.535533906), (13.15, -9))
        make_face()
        with BuildLine():
            ThreePointArc((13.15, -21.4), (16.685533906, -22.864466094), (18.15, -26.4))
            Line((18.15, -26.4), (18.15, -21.4))
            Line((18.15, -21.4), (13.15, -21.4))
        make_face()
    extrude(amount=FILLET8_DEPTH)

    # Fillet8 2 outline → Fillet8 2 (add)
    with BuildSketch(Plane(origin=(0, 0, 0), x_dir=(1, 0, 0), z_dir=(0, 1, 0)).offset(FILLET8_START_2)):
        with BuildLine():
            Line((13.15, -9), (18.15, -9))
            Line((18.15, -9), (18.15, -4))
            ThreePointArc((18.15, -4), (16.685533906, -7.535533906), (13.15, -9))
        make_face()
        with BuildLine():
            ThreePointArc((13.15, -21.4), (16.685533906, -22.864466094), (18.15, -26.4))
            Line((18.15, -26.4), (18.15, -21.4))
            Line((18.15, -21.4), (13.15, -21.4))
        make_face()
    extrude(amount=FILLET8_2_DEPTH)

    # Fillet8 3 outline → Fillet8 3 (add)
    with BuildSketch(Plane(origin=(0, 0, 0), x_dir=(1, 0, 0), z_dir=(0, 1, 0)).offset(FILLET8_START_3)):
        with BuildLine():
            ThreePointArc((13.15, -21.4), (16.685533906, -22.864466094), (18.15, -26.4))
            Line((18.15, -26.4), (18.15, -21.4))
            Line((18.15, -21.4), (13.15, -21.4))
        make_face()
        with BuildLine():
            ThreePointArc((18.15, -4), (16.685533906, -7.535533906), (13.15, -9))
            Line((13.15, -9), (18.15, -9))
            Line((18.15, -9), (18.15, -4))
        make_face()
    extrude(amount=FILLET8_3_DEPTH)

    # Fillet8 4 outline → Fillet8 4 (add)
    with BuildSketch(Plane(origin=(0, 0, 0), x_dir=(1, 0, 0), z_dir=(0, 1, 0)).offset(FILLET8_START_4)):
        with BuildLine():
            ThreePointArc((13.15, -21.4), (16.685533906, -22.864466094), (18.15, -26.4))
            Line((18.15, -26.4), (18.15, -21.4))
            Line((18.15, -21.4), (13.15, -21.4))
        make_face()
        with BuildLine():
            ThreePointArc((18.15, -4), (16.685533906, -7.535533906), (13.15, -9))
            Line((13.15, -9), (18.15, -9))
            Line((18.15, -9), (18.15, -4))
        make_face()
    extrude(amount=FILLET8_4_DEPTH)

    # Fillet8 5 outline → Fillet8 5 (cut)
    with BuildSketch(Plane.YZ.offset(FILLET8_START_5)):
        with BuildLine():
            ThreePointArc((-12.31848008, 4), (-14.236321993, 6.556116122), (-16.295272761, 9.000000114))
            Line((-16.295272761, 9.000000114), (-16.295273118, 4))
            Line((-16.295273118, 4), (-12.31848008, 4))
        make_face()
        with BuildLine():
            Line((-16.295273118, 26.4), (-16.295272761, 21.399999886))
            ThreePointArc((-16.295272761, 21.399999886), (-14.236321993, 23.843883878), (-12.31848008, 26.4))
            Line((-12.31848008, 26.4), (-16.295273118, 26.4))
        make_face()
        with BuildLine():
            Line((16.30472734, 26.4), (15.262410605, 26.4))
            ThreePointArc((15.262410605, 26.4), (15.765062943, 23.896142171), (16.30472734, 21.4))
            Line((16.30472734, 21.4), (16.30472734, 26.4))
        make_face()
        with BuildLine():
            Line((16.30472734, 4), (16.30472734, 9))
            ThreePointArc((16.30472734, 9), (15.765062943, 6.503857829), (15.262410605, 4))
            Line((15.262410605, 4), (16.30472734, 4))
        make_face()
    extrude(amount=FILLET8_5_DEPTH, mode=Mode.SUBTRACT)

    # Fillet9
    fillet9_edges = [part.edges().sort_by_distance(p)[0] for p in [
        (18.150000000000002, 2.76e-14, 7),
    ]]
    fillet(fillet9_edges, radius=FILLET9_R)


with BuildPart() as body_2:
    # Servo Micro: read off the stored shape, not the designer's step
    # Servo Micro outline → Servo Micro (new body)
    with BuildSketch(Plane(origin=(0, 0, 0), x_dir=(1, 0, 0), z_dir=(0, 1, 0)).offset(SERVO_START)):
        with Locations((-12.067487826, -26.388081974)):
            Rectangle(SERVO_MICRO_OUTLINE_W, SERVO_MICRO_OUTLINE_H)
    extrude(amount=SERVO_MICRO_DEPTH)

    # Servo Micro 2 outline → Servo Micro 2 (add)
    with BuildSketch(Plane(origin=(0, 0, 0), x_dir=(1, 0, 0), z_dir=(0, 1, 0)).offset(SERVO_START_2)):
        with BuildLine():
            ThreePointArc((-11.10082116, -25.109193568), (-23.367487826, -26.388081974), (-11.10082116, -27.666970381))
            ThreePointArc((-11.10082116, -27.666970381), (-9.567487826, -26.388081975), (-11.10082116, -25.109193568))
        make_face()
    extrude(amount=SERVO_MICRO_2_DEPTH)

    # Servo Micro 3 outline → Servo Micro 3 (add)
    with BuildSketch(Plane(origin=(0, 0, 0), x_dir=(1, 0, 0), z_dir=(0, 1, 0)).offset(SERVO_START_3)):
        with BuildLine():
            Line((2.567676828, -25.838081974), (4.232512174, -25.838081974))
            Line((4.232512174, -25.838081974), (4.232512174, -20.188081974))
            Line((4.232512174, -20.188081974), (-0.767487826, -20.188081974))
            Line((-0.767487826, -20.188081974), (-0.767487826, -32.588081974))
            Line((-0.767487826, -32.588081974), (4.232512174, -32.588081974))
            Line((4.232512174, -32.588081974), (4.232512174, -26.938081974))
            Line((4.232512174, -26.938081974), (2.567676828, -26.938081974))
            ThreePointArc((2.567676828, -26.938081974), (0.732512174, -26.388081974), (2.567676828, -25.838081974))
        make_face()
        with BuildLine():
            Line((-23.367487826, -32.588081974), (-23.367487826, -20.188081974))
            Line((-23.367487826, -20.188081974), (-28.367487826, -20.188081974))
            Line((-28.367487826, -20.188081974), (-28.367487826, -25.838081974))
            Line((-28.367487826, -25.838081974), (-26.702652481, -25.838081974))
            ThreePointArc((-26.702652481, -25.838081974), (-24.867487826, -26.388081974), (-26.702652481, -26.938081974))
            Line((-26.702652481, -26.938081974), (-28.367487826, -26.938081974))
            Line((-28.367487826, -26.938081974), (-28.367487826, -32.588081974))
            Line((-28.367487826, -32.588081974), (-23.367487826, -32.588081974))
        make_face()
    extrude(amount=SERVO_MICRO_3_DEPTH)

    # Servo Micro 4 outline → Servo Micro 4 (add)
    with BuildSketch(Plane(origin=(0, 0, 0), x_dir=(1, 0, 0), z_dir=(0, 1, 0)).offset(SERVO_START_4)):
        with Locations((-17.167487826, -26.388081974)):
            Circle(SERVO_MICRO_4_OUTLINE_R)
    extrude(amount=SERVO_MICRO_4_DEPTH)


with BuildPart() as body_3:
    # Servo Micro 5 outline → Servo Micro 5 (new body)
    with BuildSketch(Plane.YZ.offset(SERVO_START_5)):
        with Locations((-8.260864102, 25.188081974)):
            Circle(SERVO_MICRO_5_OUTLINE_R)
    extrude(amount=SERVO_MICRO_5_DEPTH)


with BuildPart() as body_4:
    # Servo Micro 6 outline → Servo Micro 6 (new body)
    with BuildSketch(Plane.YZ.offset(SERVO_START_5)):
        with Locations((-8.260864102, 27.588081974)):
            Circle(SERVO_MICRO_6_OUTLINE_R)
    extrude(amount=SERVO_MICRO_6_DEPTH)


with BuildPart() as body_5:
    # Servo Micro 7 outline → Servo Micro 7 (new body)
    with BuildSketch(Plane.YZ.offset(SERVO_START_5)):
        with Locations((-8.260864102, 26.388081974)):
            Circle(SERVO_MICRO_7_OUTLINE_R)
    extrude(amount=SERVO_MICRO_7_DEPTH)


with BuildPart() as body_2_1:
    # Body-Move/Copy1: read off the stored shape, not the designer's step
    # Body-Move/Copy1: moved
    add(body_2.part.moved(Location((12.0627605, 7.6108641, -11.188082))).rotate(Axis((0, 0, 0), (0, 0, -1)), BODY_MOVE_COPY1_ANGLE))


solid = part.part
